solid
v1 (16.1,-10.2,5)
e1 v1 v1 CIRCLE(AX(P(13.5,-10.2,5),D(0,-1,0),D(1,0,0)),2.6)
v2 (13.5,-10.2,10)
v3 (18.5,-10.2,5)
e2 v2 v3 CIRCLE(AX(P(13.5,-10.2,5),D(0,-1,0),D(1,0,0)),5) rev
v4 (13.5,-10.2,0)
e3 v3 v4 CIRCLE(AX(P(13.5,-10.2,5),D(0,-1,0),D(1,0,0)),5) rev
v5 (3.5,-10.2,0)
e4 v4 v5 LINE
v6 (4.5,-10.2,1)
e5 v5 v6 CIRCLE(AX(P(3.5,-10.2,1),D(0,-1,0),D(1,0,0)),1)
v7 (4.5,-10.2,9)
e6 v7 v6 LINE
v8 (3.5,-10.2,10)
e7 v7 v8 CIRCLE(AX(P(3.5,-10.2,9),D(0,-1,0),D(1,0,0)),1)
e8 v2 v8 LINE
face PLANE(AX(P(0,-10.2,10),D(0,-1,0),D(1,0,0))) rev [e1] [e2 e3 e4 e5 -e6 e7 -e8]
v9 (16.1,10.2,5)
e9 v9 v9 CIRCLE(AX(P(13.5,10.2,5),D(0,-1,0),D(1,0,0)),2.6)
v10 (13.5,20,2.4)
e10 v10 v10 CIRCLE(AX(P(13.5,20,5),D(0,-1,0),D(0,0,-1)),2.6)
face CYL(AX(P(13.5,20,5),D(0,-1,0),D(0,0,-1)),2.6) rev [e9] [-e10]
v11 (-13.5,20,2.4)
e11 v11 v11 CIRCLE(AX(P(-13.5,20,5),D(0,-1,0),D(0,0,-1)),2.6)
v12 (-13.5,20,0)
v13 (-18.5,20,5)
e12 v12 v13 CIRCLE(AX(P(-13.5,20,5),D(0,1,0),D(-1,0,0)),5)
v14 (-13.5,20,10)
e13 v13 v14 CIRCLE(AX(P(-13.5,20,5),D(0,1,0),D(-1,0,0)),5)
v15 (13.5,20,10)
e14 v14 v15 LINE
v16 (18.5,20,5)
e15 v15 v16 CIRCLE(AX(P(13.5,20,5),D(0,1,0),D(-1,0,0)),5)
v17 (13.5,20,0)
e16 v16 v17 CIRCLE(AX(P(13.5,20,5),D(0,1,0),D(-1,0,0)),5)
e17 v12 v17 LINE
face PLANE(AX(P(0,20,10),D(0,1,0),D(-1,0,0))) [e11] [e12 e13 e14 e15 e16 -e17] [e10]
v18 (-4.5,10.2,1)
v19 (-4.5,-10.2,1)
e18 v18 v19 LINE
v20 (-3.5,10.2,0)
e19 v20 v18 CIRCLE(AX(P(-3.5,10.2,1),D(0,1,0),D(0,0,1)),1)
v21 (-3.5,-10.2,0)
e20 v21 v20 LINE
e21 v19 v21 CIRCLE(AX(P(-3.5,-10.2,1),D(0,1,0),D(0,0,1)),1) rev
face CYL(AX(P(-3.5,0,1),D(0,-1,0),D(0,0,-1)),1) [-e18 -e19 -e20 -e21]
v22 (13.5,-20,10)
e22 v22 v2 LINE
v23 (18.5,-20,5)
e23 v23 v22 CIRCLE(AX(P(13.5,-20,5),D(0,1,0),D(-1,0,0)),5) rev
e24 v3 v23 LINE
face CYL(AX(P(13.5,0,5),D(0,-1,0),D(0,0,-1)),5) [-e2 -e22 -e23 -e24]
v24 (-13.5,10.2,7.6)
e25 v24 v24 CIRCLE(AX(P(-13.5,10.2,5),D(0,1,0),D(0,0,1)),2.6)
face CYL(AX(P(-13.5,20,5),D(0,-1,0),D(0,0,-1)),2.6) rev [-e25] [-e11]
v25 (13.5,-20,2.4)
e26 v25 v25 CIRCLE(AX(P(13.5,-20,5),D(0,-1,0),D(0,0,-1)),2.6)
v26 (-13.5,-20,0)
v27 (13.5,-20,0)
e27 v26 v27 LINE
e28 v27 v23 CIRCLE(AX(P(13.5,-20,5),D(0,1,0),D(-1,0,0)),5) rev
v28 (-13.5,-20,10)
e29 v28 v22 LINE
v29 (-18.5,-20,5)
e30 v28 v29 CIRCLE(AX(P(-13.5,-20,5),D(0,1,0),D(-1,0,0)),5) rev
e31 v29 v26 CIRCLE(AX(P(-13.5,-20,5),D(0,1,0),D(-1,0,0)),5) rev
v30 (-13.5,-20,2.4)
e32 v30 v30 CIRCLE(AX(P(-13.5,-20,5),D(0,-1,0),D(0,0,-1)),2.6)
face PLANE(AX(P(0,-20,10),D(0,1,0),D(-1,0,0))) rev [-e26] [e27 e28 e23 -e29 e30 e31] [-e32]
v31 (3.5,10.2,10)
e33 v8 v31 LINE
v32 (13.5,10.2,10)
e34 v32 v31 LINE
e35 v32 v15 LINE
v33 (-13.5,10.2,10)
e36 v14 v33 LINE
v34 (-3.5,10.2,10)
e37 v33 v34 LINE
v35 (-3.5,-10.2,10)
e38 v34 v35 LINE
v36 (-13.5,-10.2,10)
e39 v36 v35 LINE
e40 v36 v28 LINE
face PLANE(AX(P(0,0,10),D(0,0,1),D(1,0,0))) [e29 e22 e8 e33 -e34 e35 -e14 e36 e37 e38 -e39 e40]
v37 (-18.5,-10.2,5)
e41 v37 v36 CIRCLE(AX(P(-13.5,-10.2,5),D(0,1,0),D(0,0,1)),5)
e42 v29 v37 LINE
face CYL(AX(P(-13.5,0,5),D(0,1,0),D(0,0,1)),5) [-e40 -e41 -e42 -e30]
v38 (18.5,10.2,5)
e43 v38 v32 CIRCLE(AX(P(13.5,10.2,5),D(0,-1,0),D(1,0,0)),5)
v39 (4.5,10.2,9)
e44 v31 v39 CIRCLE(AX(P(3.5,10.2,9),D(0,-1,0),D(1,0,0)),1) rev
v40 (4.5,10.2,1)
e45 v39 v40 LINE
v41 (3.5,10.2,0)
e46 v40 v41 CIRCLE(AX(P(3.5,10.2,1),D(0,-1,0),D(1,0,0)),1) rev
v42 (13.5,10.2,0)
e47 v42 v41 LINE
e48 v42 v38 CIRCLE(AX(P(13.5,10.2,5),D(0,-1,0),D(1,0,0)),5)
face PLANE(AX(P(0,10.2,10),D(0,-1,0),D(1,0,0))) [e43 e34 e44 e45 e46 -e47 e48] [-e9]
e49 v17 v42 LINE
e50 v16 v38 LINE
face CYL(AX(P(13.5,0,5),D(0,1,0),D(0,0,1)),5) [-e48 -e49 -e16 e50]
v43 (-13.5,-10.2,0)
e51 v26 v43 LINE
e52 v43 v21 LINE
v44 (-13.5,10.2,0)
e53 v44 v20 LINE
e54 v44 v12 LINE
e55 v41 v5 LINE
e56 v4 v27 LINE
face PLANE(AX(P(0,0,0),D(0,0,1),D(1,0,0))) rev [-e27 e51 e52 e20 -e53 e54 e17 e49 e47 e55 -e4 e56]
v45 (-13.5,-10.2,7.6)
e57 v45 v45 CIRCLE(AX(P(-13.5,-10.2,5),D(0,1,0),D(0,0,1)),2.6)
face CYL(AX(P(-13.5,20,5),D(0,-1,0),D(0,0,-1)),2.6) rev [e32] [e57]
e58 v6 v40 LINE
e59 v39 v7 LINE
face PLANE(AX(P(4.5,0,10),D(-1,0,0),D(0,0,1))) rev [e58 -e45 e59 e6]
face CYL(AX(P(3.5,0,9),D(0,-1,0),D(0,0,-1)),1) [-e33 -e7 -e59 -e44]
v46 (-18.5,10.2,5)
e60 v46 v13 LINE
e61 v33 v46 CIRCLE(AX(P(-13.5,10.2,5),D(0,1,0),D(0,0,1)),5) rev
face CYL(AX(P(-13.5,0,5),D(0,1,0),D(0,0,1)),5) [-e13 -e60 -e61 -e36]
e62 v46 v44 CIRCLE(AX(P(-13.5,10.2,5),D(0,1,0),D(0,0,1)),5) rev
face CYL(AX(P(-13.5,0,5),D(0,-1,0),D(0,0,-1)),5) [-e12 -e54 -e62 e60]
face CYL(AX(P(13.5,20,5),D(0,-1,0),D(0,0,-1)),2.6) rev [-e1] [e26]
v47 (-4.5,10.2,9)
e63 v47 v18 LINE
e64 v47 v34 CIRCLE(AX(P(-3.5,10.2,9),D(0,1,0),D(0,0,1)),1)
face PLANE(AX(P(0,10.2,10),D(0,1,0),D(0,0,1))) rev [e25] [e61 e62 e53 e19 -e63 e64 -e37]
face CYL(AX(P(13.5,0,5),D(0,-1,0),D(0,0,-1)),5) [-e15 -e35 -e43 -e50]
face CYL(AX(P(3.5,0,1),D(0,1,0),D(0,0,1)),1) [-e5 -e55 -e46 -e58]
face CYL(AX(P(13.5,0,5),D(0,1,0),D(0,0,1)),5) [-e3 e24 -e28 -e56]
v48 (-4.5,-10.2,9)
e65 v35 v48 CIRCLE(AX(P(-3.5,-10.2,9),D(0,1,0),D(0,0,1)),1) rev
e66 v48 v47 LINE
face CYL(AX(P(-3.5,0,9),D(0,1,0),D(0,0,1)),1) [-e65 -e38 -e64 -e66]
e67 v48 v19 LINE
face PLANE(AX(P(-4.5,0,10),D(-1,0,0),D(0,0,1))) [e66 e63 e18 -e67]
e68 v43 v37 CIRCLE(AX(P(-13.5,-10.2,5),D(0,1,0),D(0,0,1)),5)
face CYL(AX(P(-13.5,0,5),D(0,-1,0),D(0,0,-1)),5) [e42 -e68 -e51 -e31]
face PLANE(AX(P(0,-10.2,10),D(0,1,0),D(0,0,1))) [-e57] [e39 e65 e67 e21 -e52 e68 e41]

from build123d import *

# Parameters (mm, degrees)
BOSS_EXTRUDE2_DEPTH = 10
FILLET1_R           = 5
FILLET2_R           = 1
SKETCH2_R           = 2.6
CUT_EXTRUDE1_DEPTH  = 46.191260217


with BuildPart() as part:
    # Sketch1 → Boss-Extrude2 (new body)
    with BuildSketch(Plane.XY):
        Polygon((-18.5, -10.2), (-18.5, -20), (18.5, -20), (18.5, -10.2), (4.5, -10.2), (4.5, 10.2), (18.5, 10.2), (18.5, 20), (-18.5, 20), (-18.5, 10.2), (-4.5, 10.2), (-4.5, -10.2), align=None)
    extrude(amount=BOSS_EXTRUDE2_DEPTH)

    # Fillet1
    fillet1_edges = [part.edges().sort_by_distance(p)[0] for p in [
        (18.5, 15.1, 0),
        (18.5, 15.1, 10),
        (18.5, -15.1, 0),
        (18.5, -15.1, 10),
        (-18.5, 15.1, 0),
        (-18.5, -15.1, 0),
        (-18.5, -15.1, 10),
        (-18.5, 15.1, 10),
    ]]
    fillet(fillet1_edges, radius=FILLET1_R - 0.0001)  # a hair under: the kernel refuses the full size

    # Fillet2
    fillet2_edges = [part.edges().sort_by_distance(p)[0] for p in [
        (4.5, 0, 10),
        (-4.5, 0, 0),
        (4.5, 0, 0),
        (-4.5, 0, 10),
    ]]
    fillet(fillet2_edges, radius=FILLET2_R)

    # Sketch2 → Cut-Extrude1 (cut, through all)
    with BuildSketch(Plane.XZ.offset(20)):
        with Locations(Location((-13.5, 5, 0), (0, 0, 270))):
            Circle(SKETCH2_R)
        with Locations(Location((13.5, 5, 0), (0, 0, 270))):
            Circle(SKETCH2_R)
    extrude(amount=-CUT_EXTRUDE1_DEPTH, mode=Mode.SUBTRACT)


solid = part.part
